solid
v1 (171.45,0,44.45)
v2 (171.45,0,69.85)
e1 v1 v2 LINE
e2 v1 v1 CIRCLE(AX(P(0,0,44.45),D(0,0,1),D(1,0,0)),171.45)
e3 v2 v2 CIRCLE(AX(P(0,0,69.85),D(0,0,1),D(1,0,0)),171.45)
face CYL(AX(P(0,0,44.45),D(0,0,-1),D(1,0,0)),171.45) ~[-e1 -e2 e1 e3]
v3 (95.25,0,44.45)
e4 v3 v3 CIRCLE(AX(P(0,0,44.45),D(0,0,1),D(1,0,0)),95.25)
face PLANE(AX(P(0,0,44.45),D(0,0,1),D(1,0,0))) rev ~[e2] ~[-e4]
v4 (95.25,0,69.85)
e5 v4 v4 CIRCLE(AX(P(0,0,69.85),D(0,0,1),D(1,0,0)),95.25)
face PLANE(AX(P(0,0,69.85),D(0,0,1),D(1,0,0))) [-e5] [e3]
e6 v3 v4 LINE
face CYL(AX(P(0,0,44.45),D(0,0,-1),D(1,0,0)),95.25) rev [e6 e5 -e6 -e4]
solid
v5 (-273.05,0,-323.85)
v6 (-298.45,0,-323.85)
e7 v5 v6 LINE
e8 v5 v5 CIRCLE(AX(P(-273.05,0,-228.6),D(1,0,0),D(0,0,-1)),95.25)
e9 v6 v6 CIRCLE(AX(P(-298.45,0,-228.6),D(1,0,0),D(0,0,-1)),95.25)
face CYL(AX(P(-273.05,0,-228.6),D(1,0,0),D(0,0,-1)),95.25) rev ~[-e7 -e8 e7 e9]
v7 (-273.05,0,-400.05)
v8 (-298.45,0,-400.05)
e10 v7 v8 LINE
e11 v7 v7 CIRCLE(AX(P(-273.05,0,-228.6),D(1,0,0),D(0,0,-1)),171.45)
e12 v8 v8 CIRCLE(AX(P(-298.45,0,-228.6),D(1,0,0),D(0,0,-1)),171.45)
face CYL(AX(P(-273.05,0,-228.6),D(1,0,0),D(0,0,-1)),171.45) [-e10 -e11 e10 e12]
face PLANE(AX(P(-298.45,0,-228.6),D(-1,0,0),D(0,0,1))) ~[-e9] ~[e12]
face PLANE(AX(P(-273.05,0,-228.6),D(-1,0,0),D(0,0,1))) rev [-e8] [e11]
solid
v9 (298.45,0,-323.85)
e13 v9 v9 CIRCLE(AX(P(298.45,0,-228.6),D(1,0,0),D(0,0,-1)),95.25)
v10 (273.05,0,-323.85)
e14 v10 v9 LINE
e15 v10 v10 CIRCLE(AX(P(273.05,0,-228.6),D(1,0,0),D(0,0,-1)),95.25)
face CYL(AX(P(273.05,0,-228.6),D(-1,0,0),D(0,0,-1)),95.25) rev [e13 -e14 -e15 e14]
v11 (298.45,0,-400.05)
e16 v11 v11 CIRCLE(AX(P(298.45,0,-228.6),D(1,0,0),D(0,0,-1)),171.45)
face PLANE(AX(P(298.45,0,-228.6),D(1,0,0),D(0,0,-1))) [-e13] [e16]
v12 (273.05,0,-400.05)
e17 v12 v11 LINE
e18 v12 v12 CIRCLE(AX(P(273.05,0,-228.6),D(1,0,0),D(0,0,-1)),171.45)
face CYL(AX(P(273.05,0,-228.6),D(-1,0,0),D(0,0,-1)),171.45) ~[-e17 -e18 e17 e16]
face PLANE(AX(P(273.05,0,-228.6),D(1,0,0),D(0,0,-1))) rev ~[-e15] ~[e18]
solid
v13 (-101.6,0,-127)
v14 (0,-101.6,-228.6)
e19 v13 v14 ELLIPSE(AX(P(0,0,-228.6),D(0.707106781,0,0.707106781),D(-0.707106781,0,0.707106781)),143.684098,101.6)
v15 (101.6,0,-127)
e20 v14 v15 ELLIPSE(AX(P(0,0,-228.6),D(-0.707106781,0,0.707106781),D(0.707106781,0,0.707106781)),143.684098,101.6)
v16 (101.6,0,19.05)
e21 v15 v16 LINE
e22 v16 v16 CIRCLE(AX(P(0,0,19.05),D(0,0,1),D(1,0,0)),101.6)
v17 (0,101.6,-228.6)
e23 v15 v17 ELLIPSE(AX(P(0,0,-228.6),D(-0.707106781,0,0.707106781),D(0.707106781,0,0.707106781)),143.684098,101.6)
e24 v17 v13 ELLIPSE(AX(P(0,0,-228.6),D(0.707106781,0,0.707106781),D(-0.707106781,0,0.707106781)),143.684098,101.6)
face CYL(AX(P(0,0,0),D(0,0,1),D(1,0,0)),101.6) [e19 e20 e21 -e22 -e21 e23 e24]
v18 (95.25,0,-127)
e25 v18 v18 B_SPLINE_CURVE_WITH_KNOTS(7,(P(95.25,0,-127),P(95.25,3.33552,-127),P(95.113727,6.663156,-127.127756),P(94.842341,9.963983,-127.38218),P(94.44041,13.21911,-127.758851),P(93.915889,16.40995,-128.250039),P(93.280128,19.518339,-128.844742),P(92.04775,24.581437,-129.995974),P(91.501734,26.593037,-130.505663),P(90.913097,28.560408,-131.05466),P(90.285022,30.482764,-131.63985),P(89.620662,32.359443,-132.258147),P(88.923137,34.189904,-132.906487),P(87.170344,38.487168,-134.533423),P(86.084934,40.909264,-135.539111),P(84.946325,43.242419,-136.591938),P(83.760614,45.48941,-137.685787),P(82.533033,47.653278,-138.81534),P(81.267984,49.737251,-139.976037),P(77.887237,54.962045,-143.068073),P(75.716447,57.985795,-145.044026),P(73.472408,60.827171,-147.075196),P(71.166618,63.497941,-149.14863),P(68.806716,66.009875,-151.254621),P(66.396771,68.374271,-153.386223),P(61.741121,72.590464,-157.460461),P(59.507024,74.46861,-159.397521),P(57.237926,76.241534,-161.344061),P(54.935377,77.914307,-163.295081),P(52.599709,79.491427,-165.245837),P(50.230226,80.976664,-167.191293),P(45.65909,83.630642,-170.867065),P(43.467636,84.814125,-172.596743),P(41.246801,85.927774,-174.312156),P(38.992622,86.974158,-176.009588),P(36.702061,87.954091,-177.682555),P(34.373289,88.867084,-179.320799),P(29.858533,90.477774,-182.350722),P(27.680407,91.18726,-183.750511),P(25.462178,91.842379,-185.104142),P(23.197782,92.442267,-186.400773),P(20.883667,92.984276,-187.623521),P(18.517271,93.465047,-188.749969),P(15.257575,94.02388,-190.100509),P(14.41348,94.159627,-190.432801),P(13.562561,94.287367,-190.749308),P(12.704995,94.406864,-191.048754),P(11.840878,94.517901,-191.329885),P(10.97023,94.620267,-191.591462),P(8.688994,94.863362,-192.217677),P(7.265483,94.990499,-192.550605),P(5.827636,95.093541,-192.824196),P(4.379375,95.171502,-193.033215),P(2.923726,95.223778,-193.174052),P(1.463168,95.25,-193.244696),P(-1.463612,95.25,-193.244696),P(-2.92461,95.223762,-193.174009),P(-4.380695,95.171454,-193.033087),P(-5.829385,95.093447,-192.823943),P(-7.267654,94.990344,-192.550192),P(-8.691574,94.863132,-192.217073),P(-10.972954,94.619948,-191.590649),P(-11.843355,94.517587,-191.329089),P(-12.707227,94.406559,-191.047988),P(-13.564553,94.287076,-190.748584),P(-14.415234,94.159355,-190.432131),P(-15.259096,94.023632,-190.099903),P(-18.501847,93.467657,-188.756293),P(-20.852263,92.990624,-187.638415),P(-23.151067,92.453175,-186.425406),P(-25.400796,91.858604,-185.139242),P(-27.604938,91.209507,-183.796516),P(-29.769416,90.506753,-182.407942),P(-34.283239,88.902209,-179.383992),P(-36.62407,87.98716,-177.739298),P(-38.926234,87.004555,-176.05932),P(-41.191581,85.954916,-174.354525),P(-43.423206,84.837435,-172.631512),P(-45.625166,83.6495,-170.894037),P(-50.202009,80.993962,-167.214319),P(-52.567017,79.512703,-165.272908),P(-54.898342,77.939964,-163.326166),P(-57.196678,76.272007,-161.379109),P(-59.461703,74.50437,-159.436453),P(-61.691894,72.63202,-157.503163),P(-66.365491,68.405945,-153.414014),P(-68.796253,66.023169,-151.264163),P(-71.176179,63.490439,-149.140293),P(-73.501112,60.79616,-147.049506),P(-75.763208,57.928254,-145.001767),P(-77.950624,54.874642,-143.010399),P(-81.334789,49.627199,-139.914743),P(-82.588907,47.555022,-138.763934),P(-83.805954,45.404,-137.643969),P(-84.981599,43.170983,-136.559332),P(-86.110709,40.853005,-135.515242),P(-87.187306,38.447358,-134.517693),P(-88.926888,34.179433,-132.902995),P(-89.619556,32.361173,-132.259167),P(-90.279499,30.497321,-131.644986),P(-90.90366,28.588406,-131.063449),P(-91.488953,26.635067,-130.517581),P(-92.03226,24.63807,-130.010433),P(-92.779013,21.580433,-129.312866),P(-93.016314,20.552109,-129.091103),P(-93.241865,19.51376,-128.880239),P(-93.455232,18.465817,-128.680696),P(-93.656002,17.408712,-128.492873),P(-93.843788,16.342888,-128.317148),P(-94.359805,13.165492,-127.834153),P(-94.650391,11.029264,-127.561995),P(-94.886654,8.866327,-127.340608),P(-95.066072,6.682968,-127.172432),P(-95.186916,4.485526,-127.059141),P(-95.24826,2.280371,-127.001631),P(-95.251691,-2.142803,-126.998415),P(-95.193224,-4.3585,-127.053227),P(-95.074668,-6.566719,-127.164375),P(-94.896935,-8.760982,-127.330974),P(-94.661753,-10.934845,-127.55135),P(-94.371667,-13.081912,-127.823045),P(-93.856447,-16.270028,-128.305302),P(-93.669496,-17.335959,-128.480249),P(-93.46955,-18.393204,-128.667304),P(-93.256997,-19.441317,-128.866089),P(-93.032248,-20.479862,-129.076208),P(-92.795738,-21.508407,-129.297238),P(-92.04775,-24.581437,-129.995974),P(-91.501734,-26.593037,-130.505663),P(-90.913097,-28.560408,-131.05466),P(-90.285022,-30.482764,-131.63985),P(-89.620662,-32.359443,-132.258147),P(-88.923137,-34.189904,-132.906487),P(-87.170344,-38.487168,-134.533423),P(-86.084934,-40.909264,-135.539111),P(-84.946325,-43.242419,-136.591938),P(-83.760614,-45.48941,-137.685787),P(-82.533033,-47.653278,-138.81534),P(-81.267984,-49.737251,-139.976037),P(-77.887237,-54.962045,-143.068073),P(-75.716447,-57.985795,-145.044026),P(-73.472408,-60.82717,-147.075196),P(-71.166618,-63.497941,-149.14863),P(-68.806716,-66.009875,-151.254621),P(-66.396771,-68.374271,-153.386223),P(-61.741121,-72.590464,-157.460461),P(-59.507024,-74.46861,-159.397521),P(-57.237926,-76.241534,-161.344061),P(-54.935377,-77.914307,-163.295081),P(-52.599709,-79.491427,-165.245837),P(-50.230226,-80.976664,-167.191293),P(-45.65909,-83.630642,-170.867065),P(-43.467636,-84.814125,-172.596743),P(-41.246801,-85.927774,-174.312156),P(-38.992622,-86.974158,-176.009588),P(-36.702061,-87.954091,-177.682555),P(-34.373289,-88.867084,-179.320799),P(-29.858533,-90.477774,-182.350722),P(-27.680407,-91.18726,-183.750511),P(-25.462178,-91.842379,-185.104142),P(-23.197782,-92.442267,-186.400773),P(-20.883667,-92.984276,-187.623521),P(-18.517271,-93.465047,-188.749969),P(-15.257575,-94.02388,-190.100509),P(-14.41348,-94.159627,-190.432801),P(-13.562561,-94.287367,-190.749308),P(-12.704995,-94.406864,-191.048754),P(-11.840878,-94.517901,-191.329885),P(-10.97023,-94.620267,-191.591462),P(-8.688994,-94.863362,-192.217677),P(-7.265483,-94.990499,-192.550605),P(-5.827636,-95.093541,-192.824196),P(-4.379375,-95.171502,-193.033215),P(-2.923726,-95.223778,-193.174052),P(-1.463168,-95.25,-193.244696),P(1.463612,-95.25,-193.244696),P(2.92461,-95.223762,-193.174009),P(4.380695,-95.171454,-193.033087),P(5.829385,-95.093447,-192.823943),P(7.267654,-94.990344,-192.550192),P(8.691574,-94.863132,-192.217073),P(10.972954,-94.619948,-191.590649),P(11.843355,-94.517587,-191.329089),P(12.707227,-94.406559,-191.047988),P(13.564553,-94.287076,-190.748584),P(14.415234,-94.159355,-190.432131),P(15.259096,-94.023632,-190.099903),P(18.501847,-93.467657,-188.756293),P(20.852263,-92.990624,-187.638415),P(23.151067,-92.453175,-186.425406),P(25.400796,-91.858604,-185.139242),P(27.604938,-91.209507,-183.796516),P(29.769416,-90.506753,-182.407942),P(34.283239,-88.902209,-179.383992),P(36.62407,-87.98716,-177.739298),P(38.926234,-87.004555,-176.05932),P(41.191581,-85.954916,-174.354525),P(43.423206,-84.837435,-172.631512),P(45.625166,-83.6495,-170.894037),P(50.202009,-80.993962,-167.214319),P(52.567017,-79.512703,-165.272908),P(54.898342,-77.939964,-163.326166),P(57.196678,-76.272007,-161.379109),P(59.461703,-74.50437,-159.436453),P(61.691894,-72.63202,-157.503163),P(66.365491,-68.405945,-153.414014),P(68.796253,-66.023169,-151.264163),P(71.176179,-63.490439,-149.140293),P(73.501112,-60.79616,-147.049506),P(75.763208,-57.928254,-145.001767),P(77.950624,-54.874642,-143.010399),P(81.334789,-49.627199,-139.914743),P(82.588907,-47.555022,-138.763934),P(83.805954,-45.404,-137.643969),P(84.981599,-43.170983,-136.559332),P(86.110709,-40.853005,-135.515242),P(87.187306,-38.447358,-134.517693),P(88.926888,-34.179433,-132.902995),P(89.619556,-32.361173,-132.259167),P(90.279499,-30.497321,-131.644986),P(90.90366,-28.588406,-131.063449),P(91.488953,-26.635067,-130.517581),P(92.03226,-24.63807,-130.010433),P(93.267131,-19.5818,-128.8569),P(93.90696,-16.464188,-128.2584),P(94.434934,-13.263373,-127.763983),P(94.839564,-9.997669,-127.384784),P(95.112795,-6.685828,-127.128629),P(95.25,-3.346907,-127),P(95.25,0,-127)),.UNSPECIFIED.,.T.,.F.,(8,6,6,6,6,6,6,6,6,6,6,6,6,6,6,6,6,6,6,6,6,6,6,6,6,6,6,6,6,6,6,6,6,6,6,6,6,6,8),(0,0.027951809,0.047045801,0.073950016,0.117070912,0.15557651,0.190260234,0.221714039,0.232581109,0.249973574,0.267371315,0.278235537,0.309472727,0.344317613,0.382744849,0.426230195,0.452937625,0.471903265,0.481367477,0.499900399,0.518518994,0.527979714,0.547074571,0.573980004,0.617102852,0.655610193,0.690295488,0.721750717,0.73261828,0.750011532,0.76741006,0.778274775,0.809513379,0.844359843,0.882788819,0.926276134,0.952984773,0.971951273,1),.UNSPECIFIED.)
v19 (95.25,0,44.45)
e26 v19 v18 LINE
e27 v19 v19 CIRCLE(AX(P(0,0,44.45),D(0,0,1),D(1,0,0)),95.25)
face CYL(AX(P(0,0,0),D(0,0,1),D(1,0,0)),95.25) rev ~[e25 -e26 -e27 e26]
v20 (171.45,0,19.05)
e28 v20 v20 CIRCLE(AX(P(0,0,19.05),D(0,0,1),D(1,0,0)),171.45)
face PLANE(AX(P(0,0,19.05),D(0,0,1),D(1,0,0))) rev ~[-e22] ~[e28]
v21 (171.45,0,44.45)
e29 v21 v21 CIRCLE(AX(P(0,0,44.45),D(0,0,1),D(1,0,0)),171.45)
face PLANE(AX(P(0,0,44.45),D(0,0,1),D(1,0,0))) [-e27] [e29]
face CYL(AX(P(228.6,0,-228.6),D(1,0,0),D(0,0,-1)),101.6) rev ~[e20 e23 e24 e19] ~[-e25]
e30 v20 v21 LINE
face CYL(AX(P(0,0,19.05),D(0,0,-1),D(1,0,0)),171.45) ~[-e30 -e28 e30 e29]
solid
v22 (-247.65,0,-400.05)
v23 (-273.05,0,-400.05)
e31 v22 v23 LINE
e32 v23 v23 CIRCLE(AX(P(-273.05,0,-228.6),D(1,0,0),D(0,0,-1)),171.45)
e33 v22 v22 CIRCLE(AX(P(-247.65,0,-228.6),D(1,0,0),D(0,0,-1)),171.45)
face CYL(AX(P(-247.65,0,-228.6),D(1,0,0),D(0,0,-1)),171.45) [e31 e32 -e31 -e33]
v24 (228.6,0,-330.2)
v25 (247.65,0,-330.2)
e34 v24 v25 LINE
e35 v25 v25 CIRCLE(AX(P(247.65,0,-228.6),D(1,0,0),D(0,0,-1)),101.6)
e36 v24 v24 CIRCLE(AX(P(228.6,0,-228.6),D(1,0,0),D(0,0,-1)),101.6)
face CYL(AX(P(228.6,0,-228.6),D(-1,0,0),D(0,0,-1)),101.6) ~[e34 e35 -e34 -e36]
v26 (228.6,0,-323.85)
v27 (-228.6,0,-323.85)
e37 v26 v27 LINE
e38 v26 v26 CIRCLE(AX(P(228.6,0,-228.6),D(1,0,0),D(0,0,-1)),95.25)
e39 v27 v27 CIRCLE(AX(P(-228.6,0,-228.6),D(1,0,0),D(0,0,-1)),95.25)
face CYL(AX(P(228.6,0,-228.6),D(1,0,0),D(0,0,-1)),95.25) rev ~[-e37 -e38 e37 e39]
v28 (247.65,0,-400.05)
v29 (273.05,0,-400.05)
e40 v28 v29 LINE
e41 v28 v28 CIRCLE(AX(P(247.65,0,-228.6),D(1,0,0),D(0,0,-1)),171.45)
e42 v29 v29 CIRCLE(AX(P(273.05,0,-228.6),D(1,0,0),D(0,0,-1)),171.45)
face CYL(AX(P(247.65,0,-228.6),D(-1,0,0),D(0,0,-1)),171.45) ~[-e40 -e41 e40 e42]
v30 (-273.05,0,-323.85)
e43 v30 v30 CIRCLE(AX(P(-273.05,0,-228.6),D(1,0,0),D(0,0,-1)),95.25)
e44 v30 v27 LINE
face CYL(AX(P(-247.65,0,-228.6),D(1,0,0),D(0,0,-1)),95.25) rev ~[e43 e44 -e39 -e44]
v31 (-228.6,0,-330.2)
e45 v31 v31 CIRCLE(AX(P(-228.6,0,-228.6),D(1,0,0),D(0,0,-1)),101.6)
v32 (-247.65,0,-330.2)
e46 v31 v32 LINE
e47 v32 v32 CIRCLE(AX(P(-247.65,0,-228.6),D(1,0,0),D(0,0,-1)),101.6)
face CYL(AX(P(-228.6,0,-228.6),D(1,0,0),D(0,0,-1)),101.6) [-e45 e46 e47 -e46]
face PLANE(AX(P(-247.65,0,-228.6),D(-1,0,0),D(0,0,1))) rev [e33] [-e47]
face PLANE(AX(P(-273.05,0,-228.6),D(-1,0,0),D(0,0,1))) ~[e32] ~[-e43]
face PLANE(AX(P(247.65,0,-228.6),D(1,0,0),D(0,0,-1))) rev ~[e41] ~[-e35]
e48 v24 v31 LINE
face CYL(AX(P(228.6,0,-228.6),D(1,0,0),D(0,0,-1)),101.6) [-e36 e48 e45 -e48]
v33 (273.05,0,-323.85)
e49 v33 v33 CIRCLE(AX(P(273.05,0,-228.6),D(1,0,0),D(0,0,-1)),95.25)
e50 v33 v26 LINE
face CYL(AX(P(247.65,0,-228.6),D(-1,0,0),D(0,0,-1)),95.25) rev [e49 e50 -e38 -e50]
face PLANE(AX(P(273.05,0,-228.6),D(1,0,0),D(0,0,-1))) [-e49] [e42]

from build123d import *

# Parameters (mm, degrees)
F0_R      = 101.6
F0_R_2    = 95.25
F1_DEPTH  = 19.05
F2_R      = 171.45
F2_R_2    = 101.6
F2_R_3    = 95.25
F3_DEPTH  = 25.4
F9_ANGLE  = 90
F11_DEPTH = 457.2
F12_REACH = 687.4191958742
F13_DEPTH = 25.4
F14_DEPTH = 25.4
F15_DEPTH = 25.4


with BuildPart() as f1:
    # F0 (on Top) → F1 (new body)
    with BuildSketch(Plane.XY):
        Circle(F0_R)
        Circle(F0_R_2, mode=Mode.SUBTRACT)
    extrude(amount=F1_DEPTH)

    # F2 (on face) → F3 (join)
    with BuildSketch(Plane.XY.offset(19.05)):
        Circle(F2_R)
        Circle(F2_R_2, mode=Mode.SUBTRACT)
        Circle(F2_R_2)
        Circle(F2_R_3, mode=Mode.SUBTRACT)
    extrude(amount=F3_DEPTH)


with BuildPart() as f7_1:
    # F7: copy of F1
    add(f1.part.moved(Location((228.6, 0, -228.6))))


with BuildPart() as f7_1_1:
    # F9: moved
    add(f7_1.part.rotate(Axis((228.6, 122.1911609173, -228.6), (0, 1, 0)), F9_ANGLE))


with BuildPart() as f10_1:
    # F10: instance of F7_1
    add(f7_1_1.part.mirror(Plane.YZ))


with BuildPart() as f7_1_2:
    add(f7_1_1.part)

    # F11 (add, through all): a face of the model
    f11_faces = [f7_1_2.faces().sort_by_distance(p)[0] for p in [
        (228.6, 0, -129.8736819587),
    ]]

    add(f10_1.part)  # F11 merges F10_1
    extrude(f11_faces, amount=F11_DEPTH)


with BuildPart() as f1_1:
    add(f1.part)

    f12_end = f7_1_2.part.faces().sort_by_distance((0, 0, -127))[0]
    # F0 (on Top) → F12 (join, up to a face of F7_1 that its end follows)
    with BuildSketch(Plane.XY):
        Circle(F0_R)
        Circle(F0_R_2, mode=Mode.SUBTRACT)
    f12_long = extrude(amount=-F12_REACH, mode=Mode.PRIVATE)
    add(split(f12_long, bisect_by=f12_end, keep=Keep.ALL, mode=Mode.PRIVATE).solids().sort_by_distance((-98.7263180413, 0, 0))[0])


with BuildPart() as f13:
    # F13 (new): a face of the model
    f13_faces = [f1_1.part.faces().sort_by_distance(p)[0] for p in [
        (-166.6006616946, 0, 44.45),
    ]]
    extrude(f13_faces, amount=F13_DEPTH)


with BuildPart() as f14:
    # F14 (new): a face of the model
    f14_faces = [f7_1_2.part.faces().sort_by_distance(p)[0] for p in [
        (273.05, 0, -61.9993383054),
    ]]
    extrude(f14_faces, amount=F14_DEPTH)


with BuildPart() as f15:
    # F15 (new): a face of the model
    f15_faces = [f7_1_2.part.faces().sort_by_distance(p)[0] for p in [
        (-273.05, 0, -61.9993383054),
    ]]
    extrude(f15_faces, amount=F15_DEPTH)


solid = Compound([f7_1_2.part, f1_1.part, f13.part, f14.part, f15.part])
